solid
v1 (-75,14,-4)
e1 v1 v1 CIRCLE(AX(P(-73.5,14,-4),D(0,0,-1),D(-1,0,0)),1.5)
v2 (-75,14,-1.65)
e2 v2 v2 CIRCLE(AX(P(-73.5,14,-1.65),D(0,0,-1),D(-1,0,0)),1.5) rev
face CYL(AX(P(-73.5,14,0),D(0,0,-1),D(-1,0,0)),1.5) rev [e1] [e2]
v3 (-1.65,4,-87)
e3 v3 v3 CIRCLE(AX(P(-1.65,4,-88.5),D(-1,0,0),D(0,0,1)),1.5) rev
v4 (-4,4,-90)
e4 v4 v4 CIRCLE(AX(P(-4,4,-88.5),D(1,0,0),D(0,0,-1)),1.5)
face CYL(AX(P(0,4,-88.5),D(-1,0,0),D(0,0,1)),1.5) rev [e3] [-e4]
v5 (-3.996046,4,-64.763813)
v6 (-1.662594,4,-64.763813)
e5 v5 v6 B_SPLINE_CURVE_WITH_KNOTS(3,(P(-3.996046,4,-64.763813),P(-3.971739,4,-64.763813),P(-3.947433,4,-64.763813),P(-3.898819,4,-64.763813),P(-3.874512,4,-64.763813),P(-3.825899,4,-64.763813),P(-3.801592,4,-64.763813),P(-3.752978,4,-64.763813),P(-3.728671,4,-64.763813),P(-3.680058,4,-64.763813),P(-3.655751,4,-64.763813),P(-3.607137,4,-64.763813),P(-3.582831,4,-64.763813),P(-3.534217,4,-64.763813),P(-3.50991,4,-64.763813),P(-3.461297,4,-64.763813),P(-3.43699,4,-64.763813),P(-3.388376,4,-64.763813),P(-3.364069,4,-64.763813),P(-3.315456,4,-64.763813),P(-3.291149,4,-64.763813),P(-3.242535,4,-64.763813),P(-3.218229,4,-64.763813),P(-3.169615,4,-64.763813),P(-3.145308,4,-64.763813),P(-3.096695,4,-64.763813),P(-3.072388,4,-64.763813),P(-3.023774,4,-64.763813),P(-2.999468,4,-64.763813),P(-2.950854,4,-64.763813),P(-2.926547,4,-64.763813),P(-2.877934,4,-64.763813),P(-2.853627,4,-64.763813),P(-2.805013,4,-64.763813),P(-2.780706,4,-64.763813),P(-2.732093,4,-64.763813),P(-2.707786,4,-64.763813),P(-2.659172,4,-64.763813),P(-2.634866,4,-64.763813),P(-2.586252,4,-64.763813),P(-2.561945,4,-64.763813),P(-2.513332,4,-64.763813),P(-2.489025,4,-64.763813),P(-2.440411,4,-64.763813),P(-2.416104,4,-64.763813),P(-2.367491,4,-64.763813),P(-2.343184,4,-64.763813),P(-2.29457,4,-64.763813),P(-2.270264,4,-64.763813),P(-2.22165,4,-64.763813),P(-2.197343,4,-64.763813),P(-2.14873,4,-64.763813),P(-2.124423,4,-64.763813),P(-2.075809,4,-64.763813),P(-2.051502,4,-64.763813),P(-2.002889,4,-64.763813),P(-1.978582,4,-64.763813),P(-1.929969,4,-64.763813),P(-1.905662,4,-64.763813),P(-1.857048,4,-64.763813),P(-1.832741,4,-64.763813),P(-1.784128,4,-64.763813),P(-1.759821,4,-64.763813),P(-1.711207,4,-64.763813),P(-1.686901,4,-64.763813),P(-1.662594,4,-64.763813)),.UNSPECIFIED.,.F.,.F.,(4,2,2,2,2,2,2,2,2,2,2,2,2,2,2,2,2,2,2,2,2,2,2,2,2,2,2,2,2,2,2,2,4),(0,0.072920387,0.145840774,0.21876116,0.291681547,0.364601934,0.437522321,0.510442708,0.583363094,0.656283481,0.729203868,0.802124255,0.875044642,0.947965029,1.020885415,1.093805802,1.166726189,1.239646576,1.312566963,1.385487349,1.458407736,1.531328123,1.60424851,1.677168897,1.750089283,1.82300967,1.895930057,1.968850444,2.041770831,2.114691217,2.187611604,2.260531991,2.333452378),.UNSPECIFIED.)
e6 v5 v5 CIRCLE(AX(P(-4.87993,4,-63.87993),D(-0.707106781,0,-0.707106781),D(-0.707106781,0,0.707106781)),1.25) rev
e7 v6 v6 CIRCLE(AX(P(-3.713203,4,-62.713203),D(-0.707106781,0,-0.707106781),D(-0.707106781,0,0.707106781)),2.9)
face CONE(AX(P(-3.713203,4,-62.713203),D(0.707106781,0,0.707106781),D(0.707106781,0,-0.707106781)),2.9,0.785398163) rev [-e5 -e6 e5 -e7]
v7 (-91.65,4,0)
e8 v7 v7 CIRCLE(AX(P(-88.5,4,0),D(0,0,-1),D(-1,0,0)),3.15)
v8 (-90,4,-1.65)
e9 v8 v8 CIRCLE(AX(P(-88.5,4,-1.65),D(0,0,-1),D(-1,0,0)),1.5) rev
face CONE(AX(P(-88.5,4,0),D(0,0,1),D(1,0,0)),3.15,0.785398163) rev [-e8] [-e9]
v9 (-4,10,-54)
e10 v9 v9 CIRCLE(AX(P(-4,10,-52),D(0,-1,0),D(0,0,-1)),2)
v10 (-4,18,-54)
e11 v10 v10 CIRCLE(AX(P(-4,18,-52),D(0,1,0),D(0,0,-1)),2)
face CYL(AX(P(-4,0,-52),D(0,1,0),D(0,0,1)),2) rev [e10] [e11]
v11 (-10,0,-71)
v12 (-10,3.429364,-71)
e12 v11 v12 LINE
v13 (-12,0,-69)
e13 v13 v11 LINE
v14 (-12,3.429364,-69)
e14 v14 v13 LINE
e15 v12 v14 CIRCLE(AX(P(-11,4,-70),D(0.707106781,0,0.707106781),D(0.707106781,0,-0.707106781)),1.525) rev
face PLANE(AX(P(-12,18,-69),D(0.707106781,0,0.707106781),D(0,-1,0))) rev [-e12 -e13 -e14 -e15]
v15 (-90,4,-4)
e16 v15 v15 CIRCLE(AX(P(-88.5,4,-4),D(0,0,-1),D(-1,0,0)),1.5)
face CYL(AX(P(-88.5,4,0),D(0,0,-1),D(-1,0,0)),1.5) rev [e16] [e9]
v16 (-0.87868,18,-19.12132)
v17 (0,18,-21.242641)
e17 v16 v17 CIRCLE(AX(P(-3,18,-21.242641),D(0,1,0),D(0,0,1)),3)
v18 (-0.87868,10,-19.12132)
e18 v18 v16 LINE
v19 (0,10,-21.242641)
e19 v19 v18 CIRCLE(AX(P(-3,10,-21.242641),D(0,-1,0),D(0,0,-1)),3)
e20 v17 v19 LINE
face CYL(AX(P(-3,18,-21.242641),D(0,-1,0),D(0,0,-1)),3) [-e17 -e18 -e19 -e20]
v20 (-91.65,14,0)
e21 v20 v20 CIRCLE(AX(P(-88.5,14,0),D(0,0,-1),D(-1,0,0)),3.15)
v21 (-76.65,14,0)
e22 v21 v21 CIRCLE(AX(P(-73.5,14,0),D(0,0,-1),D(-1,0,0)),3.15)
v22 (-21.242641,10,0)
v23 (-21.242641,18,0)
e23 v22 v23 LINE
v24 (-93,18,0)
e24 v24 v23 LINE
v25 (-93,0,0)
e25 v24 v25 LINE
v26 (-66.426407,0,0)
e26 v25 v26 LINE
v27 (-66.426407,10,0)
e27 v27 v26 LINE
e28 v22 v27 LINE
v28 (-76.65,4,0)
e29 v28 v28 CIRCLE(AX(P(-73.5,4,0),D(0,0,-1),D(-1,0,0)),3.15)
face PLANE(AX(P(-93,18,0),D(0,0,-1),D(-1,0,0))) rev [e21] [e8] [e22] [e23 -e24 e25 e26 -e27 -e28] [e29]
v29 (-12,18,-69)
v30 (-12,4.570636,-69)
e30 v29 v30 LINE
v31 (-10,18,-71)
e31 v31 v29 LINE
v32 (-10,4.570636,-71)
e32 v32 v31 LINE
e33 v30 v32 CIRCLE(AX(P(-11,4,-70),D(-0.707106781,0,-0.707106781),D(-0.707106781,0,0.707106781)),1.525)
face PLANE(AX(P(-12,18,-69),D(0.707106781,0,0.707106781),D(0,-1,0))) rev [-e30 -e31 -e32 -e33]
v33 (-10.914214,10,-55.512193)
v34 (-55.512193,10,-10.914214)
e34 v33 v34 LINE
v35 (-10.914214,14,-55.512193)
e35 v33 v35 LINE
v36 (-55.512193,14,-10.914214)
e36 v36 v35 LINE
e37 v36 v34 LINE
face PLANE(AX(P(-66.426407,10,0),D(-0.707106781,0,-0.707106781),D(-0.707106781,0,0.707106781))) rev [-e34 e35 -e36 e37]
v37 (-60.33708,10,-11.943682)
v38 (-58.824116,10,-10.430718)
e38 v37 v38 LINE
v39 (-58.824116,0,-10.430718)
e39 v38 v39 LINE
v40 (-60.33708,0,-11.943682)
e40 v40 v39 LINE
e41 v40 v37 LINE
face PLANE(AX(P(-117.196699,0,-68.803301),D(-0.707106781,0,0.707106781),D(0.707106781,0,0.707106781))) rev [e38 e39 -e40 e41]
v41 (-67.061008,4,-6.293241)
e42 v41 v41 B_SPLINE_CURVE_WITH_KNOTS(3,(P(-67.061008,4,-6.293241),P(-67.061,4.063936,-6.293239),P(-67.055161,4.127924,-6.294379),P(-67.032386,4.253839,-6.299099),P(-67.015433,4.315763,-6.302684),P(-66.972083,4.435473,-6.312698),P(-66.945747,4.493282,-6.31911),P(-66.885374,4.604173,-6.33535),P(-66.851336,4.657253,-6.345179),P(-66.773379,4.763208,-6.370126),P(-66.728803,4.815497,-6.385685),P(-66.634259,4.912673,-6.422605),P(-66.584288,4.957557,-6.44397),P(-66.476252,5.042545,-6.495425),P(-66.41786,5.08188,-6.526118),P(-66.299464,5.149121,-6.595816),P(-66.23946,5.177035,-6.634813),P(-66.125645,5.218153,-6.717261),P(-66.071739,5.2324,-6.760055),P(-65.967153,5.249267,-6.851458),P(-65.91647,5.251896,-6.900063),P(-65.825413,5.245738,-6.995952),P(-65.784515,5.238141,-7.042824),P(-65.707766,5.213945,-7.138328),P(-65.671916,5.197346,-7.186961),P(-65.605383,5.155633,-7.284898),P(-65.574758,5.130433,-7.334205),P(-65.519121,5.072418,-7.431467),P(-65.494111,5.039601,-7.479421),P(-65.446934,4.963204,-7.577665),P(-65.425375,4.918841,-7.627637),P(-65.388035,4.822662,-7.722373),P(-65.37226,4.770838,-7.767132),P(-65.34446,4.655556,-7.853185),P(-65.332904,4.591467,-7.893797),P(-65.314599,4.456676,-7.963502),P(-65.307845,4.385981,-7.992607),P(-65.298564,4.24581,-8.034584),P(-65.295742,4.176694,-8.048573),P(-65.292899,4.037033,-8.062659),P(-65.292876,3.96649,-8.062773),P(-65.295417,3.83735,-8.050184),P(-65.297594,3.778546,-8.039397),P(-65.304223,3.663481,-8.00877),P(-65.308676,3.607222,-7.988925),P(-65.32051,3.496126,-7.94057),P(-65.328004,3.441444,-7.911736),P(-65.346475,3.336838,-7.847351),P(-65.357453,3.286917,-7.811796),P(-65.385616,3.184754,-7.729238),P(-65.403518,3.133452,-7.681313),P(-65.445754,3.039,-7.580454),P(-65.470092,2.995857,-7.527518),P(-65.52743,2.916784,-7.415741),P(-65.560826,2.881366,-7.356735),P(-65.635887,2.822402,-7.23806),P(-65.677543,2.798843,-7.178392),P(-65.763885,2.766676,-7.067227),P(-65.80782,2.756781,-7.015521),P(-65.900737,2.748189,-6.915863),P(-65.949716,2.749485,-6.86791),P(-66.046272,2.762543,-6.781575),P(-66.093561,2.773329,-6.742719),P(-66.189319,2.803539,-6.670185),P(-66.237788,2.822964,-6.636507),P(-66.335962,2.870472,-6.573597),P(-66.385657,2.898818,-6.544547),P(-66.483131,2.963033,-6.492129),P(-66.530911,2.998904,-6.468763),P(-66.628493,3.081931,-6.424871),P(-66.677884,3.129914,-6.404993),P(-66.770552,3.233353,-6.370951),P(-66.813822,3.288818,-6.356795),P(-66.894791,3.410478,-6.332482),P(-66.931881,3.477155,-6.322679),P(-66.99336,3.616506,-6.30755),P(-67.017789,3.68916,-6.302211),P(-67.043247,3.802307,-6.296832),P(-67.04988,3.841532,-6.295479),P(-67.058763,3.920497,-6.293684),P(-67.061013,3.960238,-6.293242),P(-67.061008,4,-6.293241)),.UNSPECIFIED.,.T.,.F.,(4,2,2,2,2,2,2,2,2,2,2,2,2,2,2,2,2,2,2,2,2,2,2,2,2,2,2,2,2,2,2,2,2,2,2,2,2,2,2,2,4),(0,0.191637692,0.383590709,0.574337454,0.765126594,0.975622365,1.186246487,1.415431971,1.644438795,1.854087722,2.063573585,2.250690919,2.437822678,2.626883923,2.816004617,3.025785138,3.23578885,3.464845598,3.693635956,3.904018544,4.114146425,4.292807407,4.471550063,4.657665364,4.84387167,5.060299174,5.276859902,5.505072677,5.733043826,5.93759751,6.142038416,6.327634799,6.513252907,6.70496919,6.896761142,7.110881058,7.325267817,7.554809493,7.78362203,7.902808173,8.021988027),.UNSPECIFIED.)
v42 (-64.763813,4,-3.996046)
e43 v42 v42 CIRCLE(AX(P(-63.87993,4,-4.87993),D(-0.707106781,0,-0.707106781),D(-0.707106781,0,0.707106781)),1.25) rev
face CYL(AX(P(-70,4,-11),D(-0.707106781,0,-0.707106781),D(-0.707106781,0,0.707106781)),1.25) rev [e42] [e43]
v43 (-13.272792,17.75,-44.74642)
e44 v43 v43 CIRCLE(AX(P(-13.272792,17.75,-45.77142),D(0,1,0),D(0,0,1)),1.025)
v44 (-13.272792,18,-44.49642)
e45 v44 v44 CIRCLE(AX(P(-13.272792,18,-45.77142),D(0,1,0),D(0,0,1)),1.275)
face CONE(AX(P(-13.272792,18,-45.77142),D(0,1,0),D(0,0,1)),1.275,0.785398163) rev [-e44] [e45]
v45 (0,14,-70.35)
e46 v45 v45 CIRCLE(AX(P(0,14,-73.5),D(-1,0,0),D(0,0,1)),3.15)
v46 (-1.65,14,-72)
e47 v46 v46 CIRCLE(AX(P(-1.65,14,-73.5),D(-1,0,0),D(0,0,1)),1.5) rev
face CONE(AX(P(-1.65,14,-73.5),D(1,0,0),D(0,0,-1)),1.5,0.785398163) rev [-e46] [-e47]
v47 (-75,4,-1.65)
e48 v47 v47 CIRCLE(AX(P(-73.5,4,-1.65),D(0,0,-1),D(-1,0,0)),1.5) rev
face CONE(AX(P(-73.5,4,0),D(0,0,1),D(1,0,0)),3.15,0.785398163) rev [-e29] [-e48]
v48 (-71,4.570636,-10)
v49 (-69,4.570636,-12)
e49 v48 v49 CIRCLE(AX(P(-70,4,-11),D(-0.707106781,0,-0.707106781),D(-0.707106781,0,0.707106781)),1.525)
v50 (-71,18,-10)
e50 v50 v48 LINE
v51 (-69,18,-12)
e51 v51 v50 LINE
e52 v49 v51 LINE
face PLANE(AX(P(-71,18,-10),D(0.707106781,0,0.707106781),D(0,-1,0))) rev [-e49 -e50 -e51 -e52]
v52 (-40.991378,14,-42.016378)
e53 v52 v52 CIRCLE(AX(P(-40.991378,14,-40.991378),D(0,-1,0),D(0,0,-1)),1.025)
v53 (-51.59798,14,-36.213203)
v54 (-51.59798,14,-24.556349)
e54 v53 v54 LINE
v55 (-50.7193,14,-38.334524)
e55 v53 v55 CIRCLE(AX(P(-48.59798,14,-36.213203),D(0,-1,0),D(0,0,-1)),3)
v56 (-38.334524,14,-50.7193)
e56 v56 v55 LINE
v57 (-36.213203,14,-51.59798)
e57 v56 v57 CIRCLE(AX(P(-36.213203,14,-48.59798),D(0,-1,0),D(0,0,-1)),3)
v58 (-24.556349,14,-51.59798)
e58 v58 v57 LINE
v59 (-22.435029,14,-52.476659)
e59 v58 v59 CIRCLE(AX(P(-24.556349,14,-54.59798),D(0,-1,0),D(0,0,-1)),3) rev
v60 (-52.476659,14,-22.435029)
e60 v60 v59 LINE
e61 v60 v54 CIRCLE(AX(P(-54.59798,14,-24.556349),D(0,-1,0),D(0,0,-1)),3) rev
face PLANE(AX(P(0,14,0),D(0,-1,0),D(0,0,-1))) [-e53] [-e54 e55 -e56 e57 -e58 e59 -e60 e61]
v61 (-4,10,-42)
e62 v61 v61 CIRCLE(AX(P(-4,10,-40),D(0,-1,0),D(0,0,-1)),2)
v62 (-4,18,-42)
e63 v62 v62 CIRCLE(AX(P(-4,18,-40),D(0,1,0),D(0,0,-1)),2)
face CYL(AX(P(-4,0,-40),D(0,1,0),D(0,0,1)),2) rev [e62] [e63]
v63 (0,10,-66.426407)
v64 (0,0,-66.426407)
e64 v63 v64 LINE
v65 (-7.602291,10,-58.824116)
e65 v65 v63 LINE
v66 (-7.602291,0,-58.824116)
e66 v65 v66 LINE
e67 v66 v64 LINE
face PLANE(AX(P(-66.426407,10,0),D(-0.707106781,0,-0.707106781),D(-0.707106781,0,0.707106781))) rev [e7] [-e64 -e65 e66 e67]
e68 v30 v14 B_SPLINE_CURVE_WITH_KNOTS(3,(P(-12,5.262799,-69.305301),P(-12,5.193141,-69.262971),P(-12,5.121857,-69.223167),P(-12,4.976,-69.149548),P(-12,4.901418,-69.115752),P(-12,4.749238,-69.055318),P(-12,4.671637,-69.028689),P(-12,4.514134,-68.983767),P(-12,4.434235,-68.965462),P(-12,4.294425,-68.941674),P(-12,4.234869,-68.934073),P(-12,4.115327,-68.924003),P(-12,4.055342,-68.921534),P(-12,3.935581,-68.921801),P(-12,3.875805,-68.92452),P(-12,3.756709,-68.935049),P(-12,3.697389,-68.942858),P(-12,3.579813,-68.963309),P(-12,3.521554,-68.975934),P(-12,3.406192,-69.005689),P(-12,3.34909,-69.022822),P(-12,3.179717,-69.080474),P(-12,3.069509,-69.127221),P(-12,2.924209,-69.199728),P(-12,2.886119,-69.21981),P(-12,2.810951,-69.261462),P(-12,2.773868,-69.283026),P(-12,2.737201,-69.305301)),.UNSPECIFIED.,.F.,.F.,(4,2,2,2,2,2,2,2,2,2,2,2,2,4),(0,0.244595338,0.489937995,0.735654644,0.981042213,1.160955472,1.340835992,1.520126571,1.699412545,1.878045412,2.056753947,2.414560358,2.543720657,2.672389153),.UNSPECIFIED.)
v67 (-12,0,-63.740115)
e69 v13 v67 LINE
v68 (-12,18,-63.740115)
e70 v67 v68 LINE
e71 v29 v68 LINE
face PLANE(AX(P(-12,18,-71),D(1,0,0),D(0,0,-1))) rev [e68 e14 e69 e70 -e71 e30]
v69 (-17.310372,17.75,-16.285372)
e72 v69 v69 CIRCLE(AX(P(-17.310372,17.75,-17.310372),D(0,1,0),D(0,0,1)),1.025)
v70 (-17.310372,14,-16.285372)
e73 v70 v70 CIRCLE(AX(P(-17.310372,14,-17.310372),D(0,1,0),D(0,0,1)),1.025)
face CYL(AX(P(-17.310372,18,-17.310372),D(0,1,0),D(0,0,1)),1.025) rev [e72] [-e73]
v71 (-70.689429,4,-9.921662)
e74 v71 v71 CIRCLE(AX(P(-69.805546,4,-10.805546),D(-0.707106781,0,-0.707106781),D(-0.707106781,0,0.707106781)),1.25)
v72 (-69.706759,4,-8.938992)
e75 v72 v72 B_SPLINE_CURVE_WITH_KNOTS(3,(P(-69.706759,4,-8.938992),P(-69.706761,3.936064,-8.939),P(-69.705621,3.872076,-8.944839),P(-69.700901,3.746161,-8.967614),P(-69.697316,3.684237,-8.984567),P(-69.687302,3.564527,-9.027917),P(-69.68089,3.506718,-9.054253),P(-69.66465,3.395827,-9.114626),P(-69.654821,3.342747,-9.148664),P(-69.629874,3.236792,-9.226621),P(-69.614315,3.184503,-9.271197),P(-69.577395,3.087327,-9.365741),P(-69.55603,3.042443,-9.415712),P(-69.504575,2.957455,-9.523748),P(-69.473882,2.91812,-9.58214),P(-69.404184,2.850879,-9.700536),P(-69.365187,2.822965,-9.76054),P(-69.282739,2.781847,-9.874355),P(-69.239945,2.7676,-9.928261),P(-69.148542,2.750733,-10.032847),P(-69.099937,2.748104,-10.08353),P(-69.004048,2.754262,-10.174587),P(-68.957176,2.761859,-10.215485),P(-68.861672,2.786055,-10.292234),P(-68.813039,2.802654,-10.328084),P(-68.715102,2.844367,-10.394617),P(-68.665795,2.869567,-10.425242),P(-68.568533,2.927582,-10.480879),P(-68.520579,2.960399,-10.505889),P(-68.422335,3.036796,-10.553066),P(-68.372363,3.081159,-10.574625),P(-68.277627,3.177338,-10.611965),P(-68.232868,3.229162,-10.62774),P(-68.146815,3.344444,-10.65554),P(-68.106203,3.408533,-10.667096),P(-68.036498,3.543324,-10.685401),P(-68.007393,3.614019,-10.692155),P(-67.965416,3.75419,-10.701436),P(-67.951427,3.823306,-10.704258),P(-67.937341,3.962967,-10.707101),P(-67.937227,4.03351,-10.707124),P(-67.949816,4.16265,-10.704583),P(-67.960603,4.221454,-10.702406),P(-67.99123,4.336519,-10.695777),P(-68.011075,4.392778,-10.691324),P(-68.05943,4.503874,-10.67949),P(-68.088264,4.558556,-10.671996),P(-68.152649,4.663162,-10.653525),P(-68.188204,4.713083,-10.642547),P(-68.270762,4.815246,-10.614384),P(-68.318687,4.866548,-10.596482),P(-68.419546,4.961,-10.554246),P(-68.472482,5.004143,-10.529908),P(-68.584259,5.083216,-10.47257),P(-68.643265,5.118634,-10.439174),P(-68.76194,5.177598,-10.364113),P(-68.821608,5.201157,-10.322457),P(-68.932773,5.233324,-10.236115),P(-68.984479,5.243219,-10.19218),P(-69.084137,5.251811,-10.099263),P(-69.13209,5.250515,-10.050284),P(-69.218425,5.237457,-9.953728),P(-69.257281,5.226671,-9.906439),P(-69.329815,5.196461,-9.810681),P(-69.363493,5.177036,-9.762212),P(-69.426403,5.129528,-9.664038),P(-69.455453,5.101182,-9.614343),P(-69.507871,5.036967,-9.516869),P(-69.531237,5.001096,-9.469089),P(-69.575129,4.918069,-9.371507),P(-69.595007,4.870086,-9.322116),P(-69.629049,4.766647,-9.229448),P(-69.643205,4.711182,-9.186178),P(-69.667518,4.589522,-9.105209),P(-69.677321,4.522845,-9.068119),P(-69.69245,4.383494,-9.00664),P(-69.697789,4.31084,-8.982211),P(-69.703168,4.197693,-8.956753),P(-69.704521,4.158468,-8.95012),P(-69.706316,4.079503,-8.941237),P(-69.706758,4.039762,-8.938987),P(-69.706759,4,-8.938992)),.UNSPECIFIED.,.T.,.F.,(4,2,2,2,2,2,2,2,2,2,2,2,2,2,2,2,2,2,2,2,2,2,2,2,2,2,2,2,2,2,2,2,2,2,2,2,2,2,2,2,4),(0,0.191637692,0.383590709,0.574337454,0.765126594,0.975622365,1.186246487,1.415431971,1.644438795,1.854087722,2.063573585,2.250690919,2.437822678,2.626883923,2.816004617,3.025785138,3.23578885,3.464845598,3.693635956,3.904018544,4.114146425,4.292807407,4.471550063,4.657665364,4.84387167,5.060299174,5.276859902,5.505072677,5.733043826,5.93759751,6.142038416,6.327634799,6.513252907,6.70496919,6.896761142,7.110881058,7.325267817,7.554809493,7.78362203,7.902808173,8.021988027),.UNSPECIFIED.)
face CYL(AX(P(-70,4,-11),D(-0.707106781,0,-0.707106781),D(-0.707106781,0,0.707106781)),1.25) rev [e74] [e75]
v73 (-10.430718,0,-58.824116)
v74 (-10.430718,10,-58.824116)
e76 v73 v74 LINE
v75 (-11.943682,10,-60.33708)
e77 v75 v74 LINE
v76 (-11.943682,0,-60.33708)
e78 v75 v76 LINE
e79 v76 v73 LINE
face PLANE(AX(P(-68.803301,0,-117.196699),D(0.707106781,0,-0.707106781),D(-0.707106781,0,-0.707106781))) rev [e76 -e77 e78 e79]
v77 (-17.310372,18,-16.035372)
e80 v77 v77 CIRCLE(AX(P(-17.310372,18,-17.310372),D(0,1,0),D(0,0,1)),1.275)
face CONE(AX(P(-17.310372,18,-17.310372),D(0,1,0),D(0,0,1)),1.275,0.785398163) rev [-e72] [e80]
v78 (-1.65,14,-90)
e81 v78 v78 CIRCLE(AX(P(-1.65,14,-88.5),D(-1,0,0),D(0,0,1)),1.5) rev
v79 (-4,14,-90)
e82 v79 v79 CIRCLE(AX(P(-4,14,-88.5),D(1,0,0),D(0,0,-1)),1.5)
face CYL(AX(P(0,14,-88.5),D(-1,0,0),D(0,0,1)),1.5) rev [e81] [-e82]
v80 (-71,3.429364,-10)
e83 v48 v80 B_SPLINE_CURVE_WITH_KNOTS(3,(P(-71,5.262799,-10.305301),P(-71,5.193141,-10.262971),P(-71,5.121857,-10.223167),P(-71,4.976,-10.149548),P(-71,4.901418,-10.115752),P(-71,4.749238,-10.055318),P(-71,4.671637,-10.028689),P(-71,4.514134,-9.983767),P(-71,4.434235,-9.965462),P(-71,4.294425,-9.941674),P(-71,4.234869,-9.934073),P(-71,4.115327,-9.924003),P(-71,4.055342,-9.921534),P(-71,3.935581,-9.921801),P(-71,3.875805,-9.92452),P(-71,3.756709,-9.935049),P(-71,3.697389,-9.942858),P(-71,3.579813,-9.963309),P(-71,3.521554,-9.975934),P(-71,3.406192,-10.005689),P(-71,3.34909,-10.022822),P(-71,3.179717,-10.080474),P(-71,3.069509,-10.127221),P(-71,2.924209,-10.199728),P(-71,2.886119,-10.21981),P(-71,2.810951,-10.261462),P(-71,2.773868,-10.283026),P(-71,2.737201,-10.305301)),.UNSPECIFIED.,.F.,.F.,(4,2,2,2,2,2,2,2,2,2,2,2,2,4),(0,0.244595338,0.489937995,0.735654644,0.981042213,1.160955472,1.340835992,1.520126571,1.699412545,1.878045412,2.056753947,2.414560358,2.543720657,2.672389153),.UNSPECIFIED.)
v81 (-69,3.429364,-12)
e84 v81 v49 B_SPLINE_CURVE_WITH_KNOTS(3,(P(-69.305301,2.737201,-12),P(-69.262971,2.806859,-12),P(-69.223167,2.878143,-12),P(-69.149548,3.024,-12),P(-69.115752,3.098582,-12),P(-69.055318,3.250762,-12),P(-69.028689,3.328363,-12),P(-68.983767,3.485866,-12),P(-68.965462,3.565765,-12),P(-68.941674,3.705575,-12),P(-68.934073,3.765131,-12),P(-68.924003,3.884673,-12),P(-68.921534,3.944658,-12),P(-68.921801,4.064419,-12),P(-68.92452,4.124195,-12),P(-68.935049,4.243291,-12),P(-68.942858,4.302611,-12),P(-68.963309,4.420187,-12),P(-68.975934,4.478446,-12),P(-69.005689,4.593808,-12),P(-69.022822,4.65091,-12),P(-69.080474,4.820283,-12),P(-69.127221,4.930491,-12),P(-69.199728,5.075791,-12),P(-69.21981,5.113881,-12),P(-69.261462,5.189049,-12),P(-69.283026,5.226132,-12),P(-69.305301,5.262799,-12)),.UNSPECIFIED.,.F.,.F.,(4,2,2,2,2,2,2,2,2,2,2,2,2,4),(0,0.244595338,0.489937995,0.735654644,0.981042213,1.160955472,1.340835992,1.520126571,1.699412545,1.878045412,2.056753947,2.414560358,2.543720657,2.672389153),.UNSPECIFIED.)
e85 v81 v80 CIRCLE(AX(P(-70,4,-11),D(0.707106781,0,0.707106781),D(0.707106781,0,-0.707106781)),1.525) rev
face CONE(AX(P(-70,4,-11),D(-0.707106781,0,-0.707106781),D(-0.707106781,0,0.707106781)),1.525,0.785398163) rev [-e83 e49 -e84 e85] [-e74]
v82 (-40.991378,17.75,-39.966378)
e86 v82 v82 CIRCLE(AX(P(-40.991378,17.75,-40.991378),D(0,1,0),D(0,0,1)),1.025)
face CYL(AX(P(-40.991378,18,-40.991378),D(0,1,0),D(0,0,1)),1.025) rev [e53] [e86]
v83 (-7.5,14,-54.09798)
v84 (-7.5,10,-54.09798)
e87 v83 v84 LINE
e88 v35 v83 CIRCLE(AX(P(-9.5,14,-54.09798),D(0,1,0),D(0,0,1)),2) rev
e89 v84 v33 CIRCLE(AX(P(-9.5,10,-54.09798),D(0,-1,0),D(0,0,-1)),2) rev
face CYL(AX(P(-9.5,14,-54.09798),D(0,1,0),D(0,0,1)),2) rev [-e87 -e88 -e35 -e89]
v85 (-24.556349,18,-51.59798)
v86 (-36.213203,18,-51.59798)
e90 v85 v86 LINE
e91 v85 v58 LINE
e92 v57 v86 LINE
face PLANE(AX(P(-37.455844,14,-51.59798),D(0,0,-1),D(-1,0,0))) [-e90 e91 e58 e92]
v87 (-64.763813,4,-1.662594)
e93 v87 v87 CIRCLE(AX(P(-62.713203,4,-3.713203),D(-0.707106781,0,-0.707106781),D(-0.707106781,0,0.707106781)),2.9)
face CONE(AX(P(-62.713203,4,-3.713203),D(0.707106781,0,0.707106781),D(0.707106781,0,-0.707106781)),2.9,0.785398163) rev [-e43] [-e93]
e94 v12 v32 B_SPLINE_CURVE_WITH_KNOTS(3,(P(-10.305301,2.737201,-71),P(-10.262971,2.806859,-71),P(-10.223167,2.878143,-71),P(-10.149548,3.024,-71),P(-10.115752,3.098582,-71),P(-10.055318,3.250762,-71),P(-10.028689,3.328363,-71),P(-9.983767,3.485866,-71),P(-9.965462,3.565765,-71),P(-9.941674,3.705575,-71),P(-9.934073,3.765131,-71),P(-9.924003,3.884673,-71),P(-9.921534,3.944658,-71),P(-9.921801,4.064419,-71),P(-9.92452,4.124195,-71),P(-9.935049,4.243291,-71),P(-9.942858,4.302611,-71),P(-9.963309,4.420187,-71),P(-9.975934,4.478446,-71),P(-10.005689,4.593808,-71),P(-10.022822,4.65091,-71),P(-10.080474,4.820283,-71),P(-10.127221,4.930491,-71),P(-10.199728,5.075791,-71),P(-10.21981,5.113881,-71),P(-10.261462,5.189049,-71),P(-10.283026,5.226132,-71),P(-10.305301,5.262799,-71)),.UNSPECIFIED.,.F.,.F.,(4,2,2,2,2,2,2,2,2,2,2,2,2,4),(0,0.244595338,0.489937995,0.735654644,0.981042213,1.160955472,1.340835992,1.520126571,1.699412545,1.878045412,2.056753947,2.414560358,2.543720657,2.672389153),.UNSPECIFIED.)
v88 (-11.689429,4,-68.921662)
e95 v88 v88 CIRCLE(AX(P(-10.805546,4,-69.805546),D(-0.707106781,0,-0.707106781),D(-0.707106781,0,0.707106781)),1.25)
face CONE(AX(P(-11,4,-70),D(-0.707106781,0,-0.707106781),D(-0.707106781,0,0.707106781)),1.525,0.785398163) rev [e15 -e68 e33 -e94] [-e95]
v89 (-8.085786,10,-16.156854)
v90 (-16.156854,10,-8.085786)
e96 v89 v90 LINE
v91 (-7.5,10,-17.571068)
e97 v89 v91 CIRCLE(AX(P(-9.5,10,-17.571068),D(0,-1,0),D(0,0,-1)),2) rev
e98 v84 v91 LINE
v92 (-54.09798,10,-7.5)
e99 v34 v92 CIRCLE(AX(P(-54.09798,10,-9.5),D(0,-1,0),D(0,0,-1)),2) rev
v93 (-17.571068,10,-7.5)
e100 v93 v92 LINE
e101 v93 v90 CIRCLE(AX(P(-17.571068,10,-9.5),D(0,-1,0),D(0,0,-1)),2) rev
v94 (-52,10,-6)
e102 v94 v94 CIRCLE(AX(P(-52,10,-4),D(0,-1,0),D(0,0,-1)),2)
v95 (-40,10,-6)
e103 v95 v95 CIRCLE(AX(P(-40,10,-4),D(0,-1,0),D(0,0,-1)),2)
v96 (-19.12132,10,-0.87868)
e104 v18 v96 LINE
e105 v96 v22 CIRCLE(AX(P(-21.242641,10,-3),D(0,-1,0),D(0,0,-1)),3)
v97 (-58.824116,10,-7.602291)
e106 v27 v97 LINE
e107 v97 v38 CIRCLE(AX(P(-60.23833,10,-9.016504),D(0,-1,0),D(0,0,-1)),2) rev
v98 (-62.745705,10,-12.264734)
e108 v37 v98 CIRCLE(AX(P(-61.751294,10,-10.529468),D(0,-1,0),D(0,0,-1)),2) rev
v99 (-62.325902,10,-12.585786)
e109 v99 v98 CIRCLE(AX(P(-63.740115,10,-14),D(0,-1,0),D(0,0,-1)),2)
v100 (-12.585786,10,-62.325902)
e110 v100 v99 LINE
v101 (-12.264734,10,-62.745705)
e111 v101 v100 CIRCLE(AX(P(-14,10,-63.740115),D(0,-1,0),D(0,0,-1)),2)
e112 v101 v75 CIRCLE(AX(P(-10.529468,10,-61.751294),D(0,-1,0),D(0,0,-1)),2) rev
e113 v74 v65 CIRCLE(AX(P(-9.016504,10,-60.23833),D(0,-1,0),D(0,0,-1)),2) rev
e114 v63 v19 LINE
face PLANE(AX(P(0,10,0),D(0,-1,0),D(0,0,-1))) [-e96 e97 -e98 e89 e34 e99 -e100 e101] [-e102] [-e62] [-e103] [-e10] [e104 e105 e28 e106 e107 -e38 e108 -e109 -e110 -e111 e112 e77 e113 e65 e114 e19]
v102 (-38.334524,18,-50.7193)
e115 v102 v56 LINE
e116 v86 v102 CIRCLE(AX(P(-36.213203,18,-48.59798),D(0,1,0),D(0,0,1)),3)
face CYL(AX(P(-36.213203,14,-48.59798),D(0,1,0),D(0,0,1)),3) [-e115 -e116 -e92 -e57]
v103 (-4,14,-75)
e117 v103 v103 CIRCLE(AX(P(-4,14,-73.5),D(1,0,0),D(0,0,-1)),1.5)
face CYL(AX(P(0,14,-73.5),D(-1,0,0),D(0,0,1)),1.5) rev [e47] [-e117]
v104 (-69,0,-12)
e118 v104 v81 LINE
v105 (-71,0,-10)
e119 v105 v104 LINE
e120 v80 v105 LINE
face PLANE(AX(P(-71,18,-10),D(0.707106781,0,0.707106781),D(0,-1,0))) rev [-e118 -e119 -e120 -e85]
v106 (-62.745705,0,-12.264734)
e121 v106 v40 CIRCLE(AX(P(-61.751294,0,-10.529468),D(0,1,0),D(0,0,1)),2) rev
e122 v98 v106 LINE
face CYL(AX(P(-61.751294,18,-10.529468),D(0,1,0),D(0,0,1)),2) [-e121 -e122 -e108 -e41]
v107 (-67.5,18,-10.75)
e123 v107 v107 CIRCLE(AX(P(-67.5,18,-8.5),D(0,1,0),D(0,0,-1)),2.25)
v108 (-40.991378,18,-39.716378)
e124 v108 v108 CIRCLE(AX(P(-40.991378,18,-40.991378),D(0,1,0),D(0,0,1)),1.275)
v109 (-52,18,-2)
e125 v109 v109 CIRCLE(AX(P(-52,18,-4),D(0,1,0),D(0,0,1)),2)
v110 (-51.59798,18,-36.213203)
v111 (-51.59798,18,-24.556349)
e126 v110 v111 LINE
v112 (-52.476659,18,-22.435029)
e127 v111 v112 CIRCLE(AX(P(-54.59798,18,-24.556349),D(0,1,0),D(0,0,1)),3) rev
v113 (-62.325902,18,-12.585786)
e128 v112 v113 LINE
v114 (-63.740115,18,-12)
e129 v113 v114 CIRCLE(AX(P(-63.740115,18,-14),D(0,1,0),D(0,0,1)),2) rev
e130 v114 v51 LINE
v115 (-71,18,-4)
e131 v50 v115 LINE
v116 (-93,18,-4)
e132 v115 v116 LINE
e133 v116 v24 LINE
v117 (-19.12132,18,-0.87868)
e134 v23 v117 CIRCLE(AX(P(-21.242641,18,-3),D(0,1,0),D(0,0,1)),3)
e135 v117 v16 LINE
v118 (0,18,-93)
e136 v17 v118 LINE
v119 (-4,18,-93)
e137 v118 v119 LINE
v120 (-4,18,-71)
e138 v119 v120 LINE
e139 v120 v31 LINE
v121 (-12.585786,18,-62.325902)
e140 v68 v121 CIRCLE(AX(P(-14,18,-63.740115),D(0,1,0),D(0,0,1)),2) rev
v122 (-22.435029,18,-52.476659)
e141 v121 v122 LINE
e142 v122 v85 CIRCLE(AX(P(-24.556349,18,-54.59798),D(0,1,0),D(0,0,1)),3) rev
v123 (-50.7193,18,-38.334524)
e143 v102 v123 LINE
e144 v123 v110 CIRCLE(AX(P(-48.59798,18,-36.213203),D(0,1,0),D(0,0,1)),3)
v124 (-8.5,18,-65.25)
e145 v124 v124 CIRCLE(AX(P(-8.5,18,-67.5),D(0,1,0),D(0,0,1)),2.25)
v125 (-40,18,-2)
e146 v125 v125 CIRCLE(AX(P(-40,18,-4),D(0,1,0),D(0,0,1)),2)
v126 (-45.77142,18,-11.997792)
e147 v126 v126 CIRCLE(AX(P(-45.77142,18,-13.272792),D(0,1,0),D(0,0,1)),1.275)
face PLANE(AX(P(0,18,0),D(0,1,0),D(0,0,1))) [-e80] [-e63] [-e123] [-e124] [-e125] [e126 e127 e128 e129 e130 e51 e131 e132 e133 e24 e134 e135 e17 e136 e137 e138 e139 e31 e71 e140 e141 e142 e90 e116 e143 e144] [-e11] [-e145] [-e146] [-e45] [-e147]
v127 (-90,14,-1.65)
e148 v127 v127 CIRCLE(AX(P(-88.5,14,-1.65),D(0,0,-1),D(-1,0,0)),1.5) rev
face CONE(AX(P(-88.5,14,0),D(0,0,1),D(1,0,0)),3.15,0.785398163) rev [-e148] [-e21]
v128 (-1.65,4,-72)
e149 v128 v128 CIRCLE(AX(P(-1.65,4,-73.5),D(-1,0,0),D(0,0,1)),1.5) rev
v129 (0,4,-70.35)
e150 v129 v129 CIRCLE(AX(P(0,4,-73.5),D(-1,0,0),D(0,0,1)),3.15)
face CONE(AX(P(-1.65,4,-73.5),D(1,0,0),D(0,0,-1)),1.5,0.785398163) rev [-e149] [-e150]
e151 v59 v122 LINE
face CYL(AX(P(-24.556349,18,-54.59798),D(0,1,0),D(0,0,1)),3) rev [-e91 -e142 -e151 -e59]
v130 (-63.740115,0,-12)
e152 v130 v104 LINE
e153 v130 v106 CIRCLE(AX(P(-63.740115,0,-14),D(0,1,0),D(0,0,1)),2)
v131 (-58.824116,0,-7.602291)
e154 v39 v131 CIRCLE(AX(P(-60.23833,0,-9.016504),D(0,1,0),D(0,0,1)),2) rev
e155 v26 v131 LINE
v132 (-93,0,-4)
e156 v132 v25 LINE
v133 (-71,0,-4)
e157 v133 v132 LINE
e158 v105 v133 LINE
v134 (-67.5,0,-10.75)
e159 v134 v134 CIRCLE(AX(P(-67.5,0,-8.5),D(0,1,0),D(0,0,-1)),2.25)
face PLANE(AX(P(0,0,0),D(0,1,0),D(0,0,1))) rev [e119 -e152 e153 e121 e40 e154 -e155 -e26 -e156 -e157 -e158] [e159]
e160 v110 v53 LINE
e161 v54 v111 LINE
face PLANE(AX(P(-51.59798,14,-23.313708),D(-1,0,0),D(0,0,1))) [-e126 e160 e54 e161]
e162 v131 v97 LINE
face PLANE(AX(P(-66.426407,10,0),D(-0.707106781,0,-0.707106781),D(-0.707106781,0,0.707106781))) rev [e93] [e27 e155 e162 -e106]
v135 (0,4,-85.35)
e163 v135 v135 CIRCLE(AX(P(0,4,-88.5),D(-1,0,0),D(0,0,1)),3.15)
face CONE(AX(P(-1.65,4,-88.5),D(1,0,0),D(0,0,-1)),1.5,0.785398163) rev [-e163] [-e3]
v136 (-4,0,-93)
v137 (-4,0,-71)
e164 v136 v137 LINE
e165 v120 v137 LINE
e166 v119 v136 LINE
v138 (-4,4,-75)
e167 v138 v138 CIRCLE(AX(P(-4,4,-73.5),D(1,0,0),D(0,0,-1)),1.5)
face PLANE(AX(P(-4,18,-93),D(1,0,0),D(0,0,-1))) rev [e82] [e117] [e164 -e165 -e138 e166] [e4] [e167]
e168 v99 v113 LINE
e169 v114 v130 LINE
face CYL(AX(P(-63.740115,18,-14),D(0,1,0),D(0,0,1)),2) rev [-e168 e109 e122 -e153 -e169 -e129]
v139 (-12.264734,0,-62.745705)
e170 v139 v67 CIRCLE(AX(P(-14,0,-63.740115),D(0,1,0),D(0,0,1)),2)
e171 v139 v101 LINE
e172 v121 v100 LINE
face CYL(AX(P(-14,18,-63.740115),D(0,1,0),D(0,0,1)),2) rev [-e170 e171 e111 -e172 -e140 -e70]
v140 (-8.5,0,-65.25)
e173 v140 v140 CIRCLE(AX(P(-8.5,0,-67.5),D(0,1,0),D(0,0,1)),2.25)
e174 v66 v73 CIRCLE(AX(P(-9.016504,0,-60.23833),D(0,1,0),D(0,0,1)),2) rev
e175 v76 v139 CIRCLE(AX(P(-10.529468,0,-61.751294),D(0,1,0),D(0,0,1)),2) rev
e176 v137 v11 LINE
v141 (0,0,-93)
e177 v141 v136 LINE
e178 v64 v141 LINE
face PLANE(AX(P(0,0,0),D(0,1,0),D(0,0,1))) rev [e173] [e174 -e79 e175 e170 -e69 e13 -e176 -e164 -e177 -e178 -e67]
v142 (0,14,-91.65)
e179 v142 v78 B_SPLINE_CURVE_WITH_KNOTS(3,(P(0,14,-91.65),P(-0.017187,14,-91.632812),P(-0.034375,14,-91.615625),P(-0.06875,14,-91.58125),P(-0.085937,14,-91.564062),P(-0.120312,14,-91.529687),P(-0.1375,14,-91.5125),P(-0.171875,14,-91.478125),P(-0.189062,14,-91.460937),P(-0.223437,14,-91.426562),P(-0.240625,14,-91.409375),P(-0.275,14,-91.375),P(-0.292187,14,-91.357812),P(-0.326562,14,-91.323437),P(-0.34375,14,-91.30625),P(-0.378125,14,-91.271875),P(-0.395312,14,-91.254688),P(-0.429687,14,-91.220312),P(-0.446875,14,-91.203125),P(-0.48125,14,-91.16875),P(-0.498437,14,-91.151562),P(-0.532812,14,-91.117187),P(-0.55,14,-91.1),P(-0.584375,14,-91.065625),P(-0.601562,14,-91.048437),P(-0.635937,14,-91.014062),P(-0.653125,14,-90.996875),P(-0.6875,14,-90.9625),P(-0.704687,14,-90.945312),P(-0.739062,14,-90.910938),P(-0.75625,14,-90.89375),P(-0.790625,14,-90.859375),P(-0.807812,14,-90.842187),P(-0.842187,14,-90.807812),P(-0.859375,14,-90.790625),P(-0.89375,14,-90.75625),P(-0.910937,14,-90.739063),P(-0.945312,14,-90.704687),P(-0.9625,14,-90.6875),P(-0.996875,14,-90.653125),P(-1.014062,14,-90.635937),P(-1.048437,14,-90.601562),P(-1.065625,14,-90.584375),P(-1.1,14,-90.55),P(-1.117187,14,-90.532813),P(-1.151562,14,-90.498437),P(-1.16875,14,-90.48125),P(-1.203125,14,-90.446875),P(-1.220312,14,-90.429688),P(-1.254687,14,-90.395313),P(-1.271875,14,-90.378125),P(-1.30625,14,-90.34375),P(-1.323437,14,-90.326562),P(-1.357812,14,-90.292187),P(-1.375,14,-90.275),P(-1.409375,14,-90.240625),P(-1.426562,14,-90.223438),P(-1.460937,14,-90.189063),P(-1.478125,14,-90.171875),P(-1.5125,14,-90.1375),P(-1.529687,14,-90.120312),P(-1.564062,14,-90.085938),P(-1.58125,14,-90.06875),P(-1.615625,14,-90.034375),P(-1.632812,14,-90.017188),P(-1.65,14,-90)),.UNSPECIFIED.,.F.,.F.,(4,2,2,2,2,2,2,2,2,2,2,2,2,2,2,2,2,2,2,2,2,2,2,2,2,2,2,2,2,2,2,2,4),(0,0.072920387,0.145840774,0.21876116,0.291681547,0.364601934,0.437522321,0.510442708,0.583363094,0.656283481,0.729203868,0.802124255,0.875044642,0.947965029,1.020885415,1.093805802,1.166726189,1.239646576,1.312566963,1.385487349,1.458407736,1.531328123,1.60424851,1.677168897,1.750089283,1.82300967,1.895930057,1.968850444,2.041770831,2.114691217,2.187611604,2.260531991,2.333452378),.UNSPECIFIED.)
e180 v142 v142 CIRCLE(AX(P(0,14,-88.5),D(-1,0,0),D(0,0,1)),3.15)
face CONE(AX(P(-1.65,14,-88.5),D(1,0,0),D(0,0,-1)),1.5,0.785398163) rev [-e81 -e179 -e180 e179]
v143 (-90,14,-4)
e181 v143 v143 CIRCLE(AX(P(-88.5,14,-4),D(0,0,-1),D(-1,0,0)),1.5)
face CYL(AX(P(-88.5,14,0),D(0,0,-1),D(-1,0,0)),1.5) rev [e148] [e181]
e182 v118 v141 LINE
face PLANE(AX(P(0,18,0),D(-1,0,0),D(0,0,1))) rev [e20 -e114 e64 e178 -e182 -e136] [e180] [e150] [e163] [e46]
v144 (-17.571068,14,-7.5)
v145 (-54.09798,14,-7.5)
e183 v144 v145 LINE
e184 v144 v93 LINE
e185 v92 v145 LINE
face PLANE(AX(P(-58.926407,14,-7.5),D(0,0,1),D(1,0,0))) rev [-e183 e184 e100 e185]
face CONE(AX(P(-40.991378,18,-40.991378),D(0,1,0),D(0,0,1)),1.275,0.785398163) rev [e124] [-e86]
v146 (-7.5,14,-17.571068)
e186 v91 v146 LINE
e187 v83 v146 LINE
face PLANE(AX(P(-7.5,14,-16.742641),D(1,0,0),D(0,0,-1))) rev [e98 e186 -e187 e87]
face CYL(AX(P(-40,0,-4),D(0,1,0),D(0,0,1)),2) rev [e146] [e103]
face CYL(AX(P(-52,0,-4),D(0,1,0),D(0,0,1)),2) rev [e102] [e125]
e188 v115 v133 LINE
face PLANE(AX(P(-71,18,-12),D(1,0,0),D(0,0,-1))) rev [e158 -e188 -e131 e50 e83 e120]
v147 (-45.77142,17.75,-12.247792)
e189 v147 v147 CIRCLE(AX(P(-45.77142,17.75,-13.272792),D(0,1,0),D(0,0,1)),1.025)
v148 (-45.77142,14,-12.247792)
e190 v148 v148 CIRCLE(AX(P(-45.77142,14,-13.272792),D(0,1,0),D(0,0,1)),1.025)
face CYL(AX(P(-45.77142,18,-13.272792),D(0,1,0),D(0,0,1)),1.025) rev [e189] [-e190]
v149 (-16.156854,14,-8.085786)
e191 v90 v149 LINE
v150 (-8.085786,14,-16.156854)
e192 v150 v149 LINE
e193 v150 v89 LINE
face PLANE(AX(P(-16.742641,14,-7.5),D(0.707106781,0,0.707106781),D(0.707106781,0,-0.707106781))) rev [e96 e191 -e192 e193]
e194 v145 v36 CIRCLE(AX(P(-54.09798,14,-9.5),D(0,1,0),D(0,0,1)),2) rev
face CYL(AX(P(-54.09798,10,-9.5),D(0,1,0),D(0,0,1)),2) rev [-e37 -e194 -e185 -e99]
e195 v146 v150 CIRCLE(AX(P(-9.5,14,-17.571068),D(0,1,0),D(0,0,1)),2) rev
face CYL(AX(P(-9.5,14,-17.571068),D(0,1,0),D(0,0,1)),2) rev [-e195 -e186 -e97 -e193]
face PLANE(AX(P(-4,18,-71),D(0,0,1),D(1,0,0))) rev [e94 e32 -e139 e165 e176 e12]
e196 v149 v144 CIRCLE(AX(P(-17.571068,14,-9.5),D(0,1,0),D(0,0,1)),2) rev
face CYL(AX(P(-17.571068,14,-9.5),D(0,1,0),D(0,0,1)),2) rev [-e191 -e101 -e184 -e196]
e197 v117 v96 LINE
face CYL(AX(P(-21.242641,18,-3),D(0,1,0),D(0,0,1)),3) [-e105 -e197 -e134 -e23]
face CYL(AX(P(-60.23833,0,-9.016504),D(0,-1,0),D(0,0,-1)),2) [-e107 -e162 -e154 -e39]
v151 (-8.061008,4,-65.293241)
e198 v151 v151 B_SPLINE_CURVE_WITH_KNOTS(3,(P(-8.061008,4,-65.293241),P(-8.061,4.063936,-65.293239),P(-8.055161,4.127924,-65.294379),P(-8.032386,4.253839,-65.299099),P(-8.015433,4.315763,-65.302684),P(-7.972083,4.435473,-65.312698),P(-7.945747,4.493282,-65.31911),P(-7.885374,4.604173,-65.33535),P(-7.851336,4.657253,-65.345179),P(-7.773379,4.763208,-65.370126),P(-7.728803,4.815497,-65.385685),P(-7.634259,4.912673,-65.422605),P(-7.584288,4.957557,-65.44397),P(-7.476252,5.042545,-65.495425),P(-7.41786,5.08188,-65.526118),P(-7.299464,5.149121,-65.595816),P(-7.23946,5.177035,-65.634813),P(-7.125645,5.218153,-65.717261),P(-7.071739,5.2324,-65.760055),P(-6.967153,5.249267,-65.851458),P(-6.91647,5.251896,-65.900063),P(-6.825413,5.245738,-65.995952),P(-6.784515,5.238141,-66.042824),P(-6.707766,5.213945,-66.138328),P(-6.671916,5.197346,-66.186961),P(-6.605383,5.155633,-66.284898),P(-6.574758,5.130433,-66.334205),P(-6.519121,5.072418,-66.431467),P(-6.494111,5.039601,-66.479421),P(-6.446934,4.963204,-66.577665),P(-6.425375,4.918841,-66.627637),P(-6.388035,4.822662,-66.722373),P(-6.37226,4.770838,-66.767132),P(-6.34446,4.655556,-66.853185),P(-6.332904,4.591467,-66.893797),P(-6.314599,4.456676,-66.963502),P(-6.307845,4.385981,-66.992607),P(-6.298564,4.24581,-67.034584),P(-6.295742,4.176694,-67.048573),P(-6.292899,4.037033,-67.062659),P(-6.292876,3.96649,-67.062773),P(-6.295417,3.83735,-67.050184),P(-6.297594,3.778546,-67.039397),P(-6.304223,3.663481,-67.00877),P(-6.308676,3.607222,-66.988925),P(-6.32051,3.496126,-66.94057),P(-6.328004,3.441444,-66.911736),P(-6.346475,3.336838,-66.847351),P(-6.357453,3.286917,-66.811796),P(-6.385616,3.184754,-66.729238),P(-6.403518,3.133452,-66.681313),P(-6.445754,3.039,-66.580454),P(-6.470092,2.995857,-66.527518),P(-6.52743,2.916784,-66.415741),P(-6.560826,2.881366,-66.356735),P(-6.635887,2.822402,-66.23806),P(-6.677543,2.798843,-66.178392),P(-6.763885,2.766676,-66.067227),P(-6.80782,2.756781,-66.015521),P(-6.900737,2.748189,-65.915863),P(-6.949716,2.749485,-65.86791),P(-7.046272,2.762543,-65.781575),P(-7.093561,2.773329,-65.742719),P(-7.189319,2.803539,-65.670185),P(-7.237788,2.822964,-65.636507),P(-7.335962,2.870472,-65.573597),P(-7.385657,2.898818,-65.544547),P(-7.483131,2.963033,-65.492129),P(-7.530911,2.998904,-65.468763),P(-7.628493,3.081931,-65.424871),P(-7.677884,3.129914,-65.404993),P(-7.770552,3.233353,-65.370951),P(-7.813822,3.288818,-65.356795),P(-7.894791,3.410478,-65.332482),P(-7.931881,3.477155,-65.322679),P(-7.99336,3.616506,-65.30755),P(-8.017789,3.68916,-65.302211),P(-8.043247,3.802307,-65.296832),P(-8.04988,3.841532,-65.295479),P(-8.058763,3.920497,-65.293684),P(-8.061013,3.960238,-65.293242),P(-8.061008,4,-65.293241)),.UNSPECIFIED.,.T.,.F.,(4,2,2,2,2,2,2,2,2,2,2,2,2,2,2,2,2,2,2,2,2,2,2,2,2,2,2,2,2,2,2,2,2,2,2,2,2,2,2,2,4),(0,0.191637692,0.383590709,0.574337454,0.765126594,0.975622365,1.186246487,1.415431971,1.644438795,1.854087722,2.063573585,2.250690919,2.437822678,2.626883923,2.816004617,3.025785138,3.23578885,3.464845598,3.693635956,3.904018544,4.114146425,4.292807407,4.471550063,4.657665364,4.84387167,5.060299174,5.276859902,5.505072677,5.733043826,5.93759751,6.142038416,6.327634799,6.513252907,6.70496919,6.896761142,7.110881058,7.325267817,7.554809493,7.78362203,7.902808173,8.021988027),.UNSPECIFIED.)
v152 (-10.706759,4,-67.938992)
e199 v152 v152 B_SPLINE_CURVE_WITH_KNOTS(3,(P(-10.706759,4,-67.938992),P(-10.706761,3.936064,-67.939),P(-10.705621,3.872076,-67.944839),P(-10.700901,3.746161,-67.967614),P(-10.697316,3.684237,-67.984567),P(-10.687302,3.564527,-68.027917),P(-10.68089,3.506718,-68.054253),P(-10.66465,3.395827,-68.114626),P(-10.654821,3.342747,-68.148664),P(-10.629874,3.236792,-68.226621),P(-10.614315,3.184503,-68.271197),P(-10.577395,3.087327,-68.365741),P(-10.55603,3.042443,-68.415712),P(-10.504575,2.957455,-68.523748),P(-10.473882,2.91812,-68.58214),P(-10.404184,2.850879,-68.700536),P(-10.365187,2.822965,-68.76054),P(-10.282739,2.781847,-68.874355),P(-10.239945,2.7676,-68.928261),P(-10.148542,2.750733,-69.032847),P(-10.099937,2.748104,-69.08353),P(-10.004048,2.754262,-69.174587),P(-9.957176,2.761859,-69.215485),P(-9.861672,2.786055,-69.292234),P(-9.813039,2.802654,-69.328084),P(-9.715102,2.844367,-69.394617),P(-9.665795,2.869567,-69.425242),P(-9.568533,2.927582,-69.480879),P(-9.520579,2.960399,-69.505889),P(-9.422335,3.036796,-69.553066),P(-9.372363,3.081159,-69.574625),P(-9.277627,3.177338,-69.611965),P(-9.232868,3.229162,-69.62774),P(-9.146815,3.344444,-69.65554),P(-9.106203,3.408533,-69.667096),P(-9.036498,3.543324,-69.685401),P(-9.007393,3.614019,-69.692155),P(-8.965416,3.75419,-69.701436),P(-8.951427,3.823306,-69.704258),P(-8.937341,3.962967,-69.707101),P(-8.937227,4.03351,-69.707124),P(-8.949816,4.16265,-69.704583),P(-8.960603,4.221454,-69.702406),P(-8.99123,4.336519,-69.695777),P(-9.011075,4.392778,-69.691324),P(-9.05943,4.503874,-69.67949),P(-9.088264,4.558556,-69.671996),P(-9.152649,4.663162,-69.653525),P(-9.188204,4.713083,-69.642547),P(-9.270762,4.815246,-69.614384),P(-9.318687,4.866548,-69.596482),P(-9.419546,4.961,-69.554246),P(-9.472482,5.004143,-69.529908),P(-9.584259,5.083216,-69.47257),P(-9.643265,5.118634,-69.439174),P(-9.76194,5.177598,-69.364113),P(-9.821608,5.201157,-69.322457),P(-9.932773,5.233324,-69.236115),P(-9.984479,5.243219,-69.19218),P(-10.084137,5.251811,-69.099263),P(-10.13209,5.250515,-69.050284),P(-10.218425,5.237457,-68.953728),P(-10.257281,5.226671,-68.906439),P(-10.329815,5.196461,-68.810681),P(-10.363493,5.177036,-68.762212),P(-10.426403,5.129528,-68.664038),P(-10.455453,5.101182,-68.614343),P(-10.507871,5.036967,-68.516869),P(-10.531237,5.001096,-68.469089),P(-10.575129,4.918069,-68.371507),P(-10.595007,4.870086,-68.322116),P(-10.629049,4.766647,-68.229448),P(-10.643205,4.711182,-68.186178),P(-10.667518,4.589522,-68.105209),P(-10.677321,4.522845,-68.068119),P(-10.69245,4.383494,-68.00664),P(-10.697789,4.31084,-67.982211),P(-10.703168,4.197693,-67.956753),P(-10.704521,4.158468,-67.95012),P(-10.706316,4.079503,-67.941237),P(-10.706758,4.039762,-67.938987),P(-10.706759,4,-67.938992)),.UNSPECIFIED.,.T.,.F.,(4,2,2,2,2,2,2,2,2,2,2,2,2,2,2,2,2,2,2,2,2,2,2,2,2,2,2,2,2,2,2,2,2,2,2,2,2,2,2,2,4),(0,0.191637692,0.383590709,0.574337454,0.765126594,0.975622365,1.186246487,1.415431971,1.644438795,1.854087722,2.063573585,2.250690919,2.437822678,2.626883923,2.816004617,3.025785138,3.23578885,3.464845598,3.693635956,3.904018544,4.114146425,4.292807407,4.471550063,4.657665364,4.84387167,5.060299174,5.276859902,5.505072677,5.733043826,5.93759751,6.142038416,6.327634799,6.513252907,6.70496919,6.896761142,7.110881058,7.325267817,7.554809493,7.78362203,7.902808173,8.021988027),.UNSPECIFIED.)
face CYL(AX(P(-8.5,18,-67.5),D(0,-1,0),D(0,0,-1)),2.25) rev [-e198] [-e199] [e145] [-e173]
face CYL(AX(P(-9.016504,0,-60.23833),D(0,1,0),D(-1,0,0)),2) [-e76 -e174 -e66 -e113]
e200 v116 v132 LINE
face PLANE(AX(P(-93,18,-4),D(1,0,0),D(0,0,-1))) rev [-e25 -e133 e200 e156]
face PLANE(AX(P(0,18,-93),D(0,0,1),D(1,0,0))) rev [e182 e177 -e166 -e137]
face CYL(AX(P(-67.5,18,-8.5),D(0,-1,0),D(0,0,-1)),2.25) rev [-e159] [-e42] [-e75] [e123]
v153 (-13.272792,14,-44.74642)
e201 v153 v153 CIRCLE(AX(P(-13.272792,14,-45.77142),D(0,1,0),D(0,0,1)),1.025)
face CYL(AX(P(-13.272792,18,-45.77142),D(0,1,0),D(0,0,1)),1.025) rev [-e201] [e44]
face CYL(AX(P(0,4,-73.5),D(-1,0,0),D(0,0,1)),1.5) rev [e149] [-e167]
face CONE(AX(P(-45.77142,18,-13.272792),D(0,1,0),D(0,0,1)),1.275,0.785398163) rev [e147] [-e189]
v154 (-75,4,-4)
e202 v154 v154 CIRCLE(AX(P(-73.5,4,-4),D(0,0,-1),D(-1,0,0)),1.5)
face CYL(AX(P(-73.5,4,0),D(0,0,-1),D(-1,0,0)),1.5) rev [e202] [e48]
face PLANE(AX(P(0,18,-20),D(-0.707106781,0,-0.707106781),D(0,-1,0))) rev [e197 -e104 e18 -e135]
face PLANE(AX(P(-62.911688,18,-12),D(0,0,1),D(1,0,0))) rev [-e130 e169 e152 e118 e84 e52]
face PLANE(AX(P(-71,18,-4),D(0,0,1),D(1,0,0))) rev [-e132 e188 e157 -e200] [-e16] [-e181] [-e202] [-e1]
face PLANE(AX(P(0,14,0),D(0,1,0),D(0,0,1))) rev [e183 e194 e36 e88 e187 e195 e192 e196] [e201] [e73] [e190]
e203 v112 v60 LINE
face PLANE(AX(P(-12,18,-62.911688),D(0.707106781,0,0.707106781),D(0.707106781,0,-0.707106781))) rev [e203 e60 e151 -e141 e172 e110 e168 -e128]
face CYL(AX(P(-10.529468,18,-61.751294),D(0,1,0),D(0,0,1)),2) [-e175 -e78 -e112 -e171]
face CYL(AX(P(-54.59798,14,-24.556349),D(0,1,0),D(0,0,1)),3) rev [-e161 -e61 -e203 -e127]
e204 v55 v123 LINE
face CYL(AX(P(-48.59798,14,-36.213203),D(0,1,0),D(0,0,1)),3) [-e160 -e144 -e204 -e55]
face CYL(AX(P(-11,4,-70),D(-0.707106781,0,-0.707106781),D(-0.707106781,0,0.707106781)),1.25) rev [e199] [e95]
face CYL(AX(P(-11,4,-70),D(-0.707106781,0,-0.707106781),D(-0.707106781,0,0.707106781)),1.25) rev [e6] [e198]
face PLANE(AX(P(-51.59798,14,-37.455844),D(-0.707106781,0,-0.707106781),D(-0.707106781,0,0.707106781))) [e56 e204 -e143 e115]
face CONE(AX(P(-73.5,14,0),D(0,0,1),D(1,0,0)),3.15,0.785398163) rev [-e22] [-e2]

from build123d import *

# Parameters (mm, degrees)
SKETCH_1_R                     = 2.25
EXTRUDE_1_DEPTH                = 18
SKETCH_2_R                     = 1.5
CUT_EXTRUDE_1_DEPTH            = 130.976921028
CHAMFER_1_SIZE                 = 1.65
CHAMFER_2_SIZE                 = 2
CUT_EXTRUDE_2_DEPTH            = 10
HOLE_WIZARD_M3_1_D             = 2.5
HOLE_WIZARD_M3_1_CSINK_D       = 3.05
HOLE_WIZARD_M3_1_CSINK_ANGLE   = 90
CHAMFER_3_SIZE                 = 1.65
SKETCH_9_R                     = 2
CUT_EXTRUDE_3_DEPTH            = 133.747881353
CHAMFER_4_SIZE                 = 20
FILLET_1_R                     = 2
CUT_EXTRUDE_4_DEPTH            = 4
FILLET_2_R                     = 2
EXTRUDE_2_DEPTH                = 4
FILLET_3_R                     = 3
FILLET_4_R                     = 3
HOLE_WIZARD_M2_5_1_D           = 2.05
HOLE_WIZARD_M2_5_1_CSINK_D     = 2.55
HOLE_WIZARD_M2_5_1_CSINK_ANGLE = 90
SKETCH_15_W                    = 68.43860018
SKETCH_15_H                    = 10
CUT_EXTRUDE_5_DEPTH            = 87.446064633
FILLET_5_R                     = 2


with BuildPart() as part:
    # 草图1 → 凸台-拉伸1 (new body)
    with BuildSketch(Plane(origin=(0, 0, 0), x_dir=(1, 0, 0), z_dir=(0, 1, 0))):
        Polygon((0, 0), (0, 93), (-4, 93), (-4, 71), (-12, 71), (-12, 62.911688245), (-62.911688245, 12), (-71, 12), (-71, 4), (-93, 4), (-93, 0), align=None)
        with Locations(Location((-8.5, 67.5, 0), (0, 0, 270))):
            Circle(SKETCH_1_R, mode=Mode.SUBTRACT)
        with Locations(Location((-67.5, 8.5, 0), (0, 0, 90))):
            Circle(SKETCH_1_R, mode=Mode.SUBTRACT)
    extrude(amount=EXTRUDE_1_DEPTH)

    # 草图2 → 切除-拉伸1 (cut, through all)
    with BuildSketch(Plane(origin=(0, 0, -4), x_dir=(-1, 0, 0), z_dir=(0, 0, -1))):
        with Locations((73.5, 14)):
            Circle(SKETCH_2_R)
        with Locations((88.5, 14)):
            Circle(SKETCH_2_R)
        with Locations((88.5, 4)):
            Circle(SKETCH_2_R)
        with Locations((73.5, 4)):
            Circle(SKETCH_2_R)
    cut_extrude_1 = extrude(amount=-CUT_EXTRUDE_1_DEPTH, mode=Mode.SUBTRACT)

    # 镜向2: 切除-拉伸1 across plane
    add(cut_extrude_1.mirror(Plane(origin=(0, 0, 0), x_dir=(0.7071067811865513, 0, 0.7071067811865437), z_dir=(0.7071067811865437, 0, -0.7071067811865513))), mode=Mode.SUBTRACT)

    # 倒角1
    chamfer_1_edges = [part.edges().sort_by_distance(p)[0] for p in [
        (-72, 4, 0),
        (-87, 4, 0),
        (-87, 14, 0),
        (-72, 14, 0),
        (0, 4, -72),
        (0, 4, -87),
        (0, 14, -87),
        (0, 14, -72),
    ]]
    chamfer(chamfer_1_edges, length=CHAMFER_1_SIZE)

    # 倒角2
    chamfer_2_edges = [part.edges().sort_by_distance(p)[0] for p in [
        (-71, 9, -12),
        (-12, 9, -71),
    ]]
    chamfer(chamfer_2_edges, length=CHAMFER_2_SIZE)

    # 草图3 → 切除-拉伸2 (cut)
    with BuildSketch(Plane.XZ):
        Polygon((0, 0), (-66.426406871, 0), (0, -66.426406871), align=None)
    extrude(amount=-CUT_EXTRUDE_2_DEPTH, mode=Mode.SUBTRACT)

    # M3 螺纹孔1 (through all)
    with Locations(Plane(origin=(-40.5, 0, -40.5), x_dir=(-0.7071067811865498, 0, 0.7071067811865452), z_dir=(-0.7071067811865452, 0, -0.7071067811865498))):
        with Locations((-41.71930009, 4), (41.71930009, 4)):
            CounterSinkHole(HOLE_WIZARD_M3_1_D / 2, HOLE_WIZARD_M3_1_CSINK_D / 2, counter_sink_angle=HOLE_WIZARD_M3_1_CSINK_ANGLE)

    # 倒角3
    chamfer_3_edges = [part.edges().sort_by_distance(p)[0] for p in [
        (-63.597086912, 4, -2.829319959),
        (-4.597086912, 4, -61.829319959),
    ]]
    chamfer(chamfer_3_edges, length=CHAMFER_3_SIZE)

    # 草图9 → 切除-拉伸3 (cut, through all)
    with BuildSketch(Plane(origin=(0, 18, 0), x_dir=(1, 0, 0), z_dir=(0, 1, 0))):
        with Locations(Location((-52, 4, 0), (0, 0, 270))):
            Circle(SKETCH_9_R)
        with Locations(Location((-40, 4, 0), (0, 0, 270))):
            Circle(SKETCH_9_R)
        with Locations(Location((-4, 40, 0), (0, 0, 90))):
            Circle(SKETCH_9_R)
        with Locations(Location((-4, 52, 0), (0, 0, 90))):
            Circle(SKETCH_9_R)
    extrude(amount=-CUT_EXTRUDE_3_DEPTH, mode=Mode.SUBTRACT)

    # 倒角4
    chamfer_4_edges = [part.edges().sort_by_distance(p)[0] for p in [
        (0, 14, 0),
    ]]
    chamfer(chamfer_4_edges, length=CHAMFER_4_SIZE)

    # 圆角1
    fillet_1_edges = [part.edges().sort_by_distance(p)[0] for p in [
        (-62.911688245, 9, -12),
        (-12, 9, -62.911688245),
    ]]
    fillet(fillet_1_edges, radius=FILLET_1_R)

    # 草图10 → 切除-拉伸4 (cut)
    with BuildSketch(Plane.XZ.offset(-10)):
        Polygon((-58.926406871, -7.5), (-16.742640687, -7.5), (-7.5, -16.742640687), (-7.5, -58.926406871), align=None)
    extrude(amount=-CUT_EXTRUDE_4_DEPTH, mode=Mode.SUBTRACT)

    # 圆角2
    fillet_2_edges = [part.edges().sort_by_distance(p)[0] for p in [
        (-7.5, 12, -58.926406871),
        (-58.926406871, 12, -7.5),
        (-16.742640687, 12, -7.5),
        (-7.5, 12, -16.742640687),
    ]]
    fillet(fillet_2_edges, radius=FILLET_2_R)

    # 草图11 → 凸台-拉伸2 (add)
    with BuildSketch(Plane(origin=(0, 18, 0), x_dir=(1, 0, 0), z_dir=(0, 1, 0))):
        Polygon((-51.597979746, 23.313708499), (-51.597979746, 37.455844123), (-37.455844123, 51.597979746), (-23.313708499, 51.597979746), align=None)
    extrude(amount=-EXTRUDE_2_DEPTH)

    # 圆角3
    fillet_3_edges = [part.edges().sort_by_distance(p)[0] for p in [
        (-23.313708499, 16, -51.597979746),
        (-51.597979746, 16, -23.313708499),
        (-51.597979746, 16, -37.455844123),
        (-37.455844123, 16, -51.597979746),
    ]]
    fillet(fillet_3_edges, radius=FILLET_3_R)

    # 圆角4
    fillet_4_edges = [part.edges().sort_by_distance(p)[0] for p in [
        (0, 14, -20),
        (-20, 14, 0),
    ]]
    fillet(fillet_4_edges, radius=FILLET_4_R)

    # M2.5 螺纹孔1 (through all)
    with Locations(Plane(origin=(0, 18, 0), x_dir=(1, 0, 0), z_dir=(0, 1, 0))):
        with Locations((-45.771419869, 13.272792206), (-17.310371927, 17.310371927), (-40.991378029, 40.991378029), (-13.272792206, 45.771419869)):
            CounterSinkHole(HOLE_WIZARD_M2_5_1_D / 2, HOLE_WIZARD_M2_5_1_CSINK_D / 2, counter_sink_angle=HOLE_WIZARD_M2_5_1_CSINK_ANGLE)

    # 草图15 → 切除-拉伸5 (cut, through all)
    with BuildSketch(Plane(origin=(-33.213203436, 0, -33.213203436), x_dir=(0.7071067811865476, 0, -0.7071067811865475), z_dir=(0.7071067811865475, 0, 0.7071067811865476))):
        with Locations((0, 5)):
            Rectangle(SKETCH_15_W, SKETCH_15_H)
    extrude(amount=-CUT_EXTRUDE_5_DEPTH, mode=Mode.SUBTRACT)

    # 圆角5
    # the kernel refuses this fillet: 2 mm, written as the material it takes off along each edge
    with BuildSketch(Plane(origin=(-61.652543264, 10, -13.259144982), x_dir=(-0.7397286230240017, 0, 0.6729053159836194), z_dir=(0, -1, 0)), Plane(origin=(-13.259144982, -4.650863848, -61.652543264), x_dir=(0.6729053159836488, 0, -0.7397286230239748), z_dir=(0, 1, 0))) as fillet_5_piece_1:
        with BuildLine():
            CenterArc((1.909862491, -1.95277003), FILLET_5_R, 102.476415923, 74.815280531)
            Line((-0.087903584, -1.858267603), (-0.287680192, -1.848817361))
            Line((-0.287680192, -1.848817361), (-0.199776608, 0.009450243))
            Line((-0.199776608, 0.009450243), (0.009450243, 0.199776608))
            ThreePointArc((0.009450243, 0.199776608), (0.960659375, 0.154780563), (1.434579479, 0.195277003))
            Line((1.434579479, 0.195277003), (1.477787025, 0))
        make_face()
    extrude(amount=14.650863848, mode=Mode.SUBTRACT)
    with BuildSketch(Plane(origin=(-57.409902577, 10, -9.016504294), x_dir=(-0.7071067811865462, 0, -0.7071067811865489), z_dir=(0, -1, 0))) as fillet_5_piece_2:
        with BuildLine():
            CenterArc((FILLET_5_R, -FILLET_5_R), FILLET_5_R, 90, 90)
            Line((0, -FILLET_5_R), (0, 0))
            Line((0, 0), (FILLET_5_R, 0))
        make_face()
    extrude(amount=15, mode=Mode.SUBTRACT)
    with BuildSketch(Plane(origin=(-9.016504294, -5, -57.409902577), x_dir=(0.7071067811865487, 0, -0.7071067811865465), z_dir=(0, 1, 0))) as fillet_5_piece_3:
        with BuildLine():
            CenterArc((FILLET_5_R, FILLET_5_R), FILLET_5_R, 180, 90)
            Line((0, FILLET_5_R), (0, 0))
            Line((0, 0), (FILLET_5_R, 0))
        make_face()
    extrude(amount=15, mode=Mode.SUBTRACT)


solid = part.part
